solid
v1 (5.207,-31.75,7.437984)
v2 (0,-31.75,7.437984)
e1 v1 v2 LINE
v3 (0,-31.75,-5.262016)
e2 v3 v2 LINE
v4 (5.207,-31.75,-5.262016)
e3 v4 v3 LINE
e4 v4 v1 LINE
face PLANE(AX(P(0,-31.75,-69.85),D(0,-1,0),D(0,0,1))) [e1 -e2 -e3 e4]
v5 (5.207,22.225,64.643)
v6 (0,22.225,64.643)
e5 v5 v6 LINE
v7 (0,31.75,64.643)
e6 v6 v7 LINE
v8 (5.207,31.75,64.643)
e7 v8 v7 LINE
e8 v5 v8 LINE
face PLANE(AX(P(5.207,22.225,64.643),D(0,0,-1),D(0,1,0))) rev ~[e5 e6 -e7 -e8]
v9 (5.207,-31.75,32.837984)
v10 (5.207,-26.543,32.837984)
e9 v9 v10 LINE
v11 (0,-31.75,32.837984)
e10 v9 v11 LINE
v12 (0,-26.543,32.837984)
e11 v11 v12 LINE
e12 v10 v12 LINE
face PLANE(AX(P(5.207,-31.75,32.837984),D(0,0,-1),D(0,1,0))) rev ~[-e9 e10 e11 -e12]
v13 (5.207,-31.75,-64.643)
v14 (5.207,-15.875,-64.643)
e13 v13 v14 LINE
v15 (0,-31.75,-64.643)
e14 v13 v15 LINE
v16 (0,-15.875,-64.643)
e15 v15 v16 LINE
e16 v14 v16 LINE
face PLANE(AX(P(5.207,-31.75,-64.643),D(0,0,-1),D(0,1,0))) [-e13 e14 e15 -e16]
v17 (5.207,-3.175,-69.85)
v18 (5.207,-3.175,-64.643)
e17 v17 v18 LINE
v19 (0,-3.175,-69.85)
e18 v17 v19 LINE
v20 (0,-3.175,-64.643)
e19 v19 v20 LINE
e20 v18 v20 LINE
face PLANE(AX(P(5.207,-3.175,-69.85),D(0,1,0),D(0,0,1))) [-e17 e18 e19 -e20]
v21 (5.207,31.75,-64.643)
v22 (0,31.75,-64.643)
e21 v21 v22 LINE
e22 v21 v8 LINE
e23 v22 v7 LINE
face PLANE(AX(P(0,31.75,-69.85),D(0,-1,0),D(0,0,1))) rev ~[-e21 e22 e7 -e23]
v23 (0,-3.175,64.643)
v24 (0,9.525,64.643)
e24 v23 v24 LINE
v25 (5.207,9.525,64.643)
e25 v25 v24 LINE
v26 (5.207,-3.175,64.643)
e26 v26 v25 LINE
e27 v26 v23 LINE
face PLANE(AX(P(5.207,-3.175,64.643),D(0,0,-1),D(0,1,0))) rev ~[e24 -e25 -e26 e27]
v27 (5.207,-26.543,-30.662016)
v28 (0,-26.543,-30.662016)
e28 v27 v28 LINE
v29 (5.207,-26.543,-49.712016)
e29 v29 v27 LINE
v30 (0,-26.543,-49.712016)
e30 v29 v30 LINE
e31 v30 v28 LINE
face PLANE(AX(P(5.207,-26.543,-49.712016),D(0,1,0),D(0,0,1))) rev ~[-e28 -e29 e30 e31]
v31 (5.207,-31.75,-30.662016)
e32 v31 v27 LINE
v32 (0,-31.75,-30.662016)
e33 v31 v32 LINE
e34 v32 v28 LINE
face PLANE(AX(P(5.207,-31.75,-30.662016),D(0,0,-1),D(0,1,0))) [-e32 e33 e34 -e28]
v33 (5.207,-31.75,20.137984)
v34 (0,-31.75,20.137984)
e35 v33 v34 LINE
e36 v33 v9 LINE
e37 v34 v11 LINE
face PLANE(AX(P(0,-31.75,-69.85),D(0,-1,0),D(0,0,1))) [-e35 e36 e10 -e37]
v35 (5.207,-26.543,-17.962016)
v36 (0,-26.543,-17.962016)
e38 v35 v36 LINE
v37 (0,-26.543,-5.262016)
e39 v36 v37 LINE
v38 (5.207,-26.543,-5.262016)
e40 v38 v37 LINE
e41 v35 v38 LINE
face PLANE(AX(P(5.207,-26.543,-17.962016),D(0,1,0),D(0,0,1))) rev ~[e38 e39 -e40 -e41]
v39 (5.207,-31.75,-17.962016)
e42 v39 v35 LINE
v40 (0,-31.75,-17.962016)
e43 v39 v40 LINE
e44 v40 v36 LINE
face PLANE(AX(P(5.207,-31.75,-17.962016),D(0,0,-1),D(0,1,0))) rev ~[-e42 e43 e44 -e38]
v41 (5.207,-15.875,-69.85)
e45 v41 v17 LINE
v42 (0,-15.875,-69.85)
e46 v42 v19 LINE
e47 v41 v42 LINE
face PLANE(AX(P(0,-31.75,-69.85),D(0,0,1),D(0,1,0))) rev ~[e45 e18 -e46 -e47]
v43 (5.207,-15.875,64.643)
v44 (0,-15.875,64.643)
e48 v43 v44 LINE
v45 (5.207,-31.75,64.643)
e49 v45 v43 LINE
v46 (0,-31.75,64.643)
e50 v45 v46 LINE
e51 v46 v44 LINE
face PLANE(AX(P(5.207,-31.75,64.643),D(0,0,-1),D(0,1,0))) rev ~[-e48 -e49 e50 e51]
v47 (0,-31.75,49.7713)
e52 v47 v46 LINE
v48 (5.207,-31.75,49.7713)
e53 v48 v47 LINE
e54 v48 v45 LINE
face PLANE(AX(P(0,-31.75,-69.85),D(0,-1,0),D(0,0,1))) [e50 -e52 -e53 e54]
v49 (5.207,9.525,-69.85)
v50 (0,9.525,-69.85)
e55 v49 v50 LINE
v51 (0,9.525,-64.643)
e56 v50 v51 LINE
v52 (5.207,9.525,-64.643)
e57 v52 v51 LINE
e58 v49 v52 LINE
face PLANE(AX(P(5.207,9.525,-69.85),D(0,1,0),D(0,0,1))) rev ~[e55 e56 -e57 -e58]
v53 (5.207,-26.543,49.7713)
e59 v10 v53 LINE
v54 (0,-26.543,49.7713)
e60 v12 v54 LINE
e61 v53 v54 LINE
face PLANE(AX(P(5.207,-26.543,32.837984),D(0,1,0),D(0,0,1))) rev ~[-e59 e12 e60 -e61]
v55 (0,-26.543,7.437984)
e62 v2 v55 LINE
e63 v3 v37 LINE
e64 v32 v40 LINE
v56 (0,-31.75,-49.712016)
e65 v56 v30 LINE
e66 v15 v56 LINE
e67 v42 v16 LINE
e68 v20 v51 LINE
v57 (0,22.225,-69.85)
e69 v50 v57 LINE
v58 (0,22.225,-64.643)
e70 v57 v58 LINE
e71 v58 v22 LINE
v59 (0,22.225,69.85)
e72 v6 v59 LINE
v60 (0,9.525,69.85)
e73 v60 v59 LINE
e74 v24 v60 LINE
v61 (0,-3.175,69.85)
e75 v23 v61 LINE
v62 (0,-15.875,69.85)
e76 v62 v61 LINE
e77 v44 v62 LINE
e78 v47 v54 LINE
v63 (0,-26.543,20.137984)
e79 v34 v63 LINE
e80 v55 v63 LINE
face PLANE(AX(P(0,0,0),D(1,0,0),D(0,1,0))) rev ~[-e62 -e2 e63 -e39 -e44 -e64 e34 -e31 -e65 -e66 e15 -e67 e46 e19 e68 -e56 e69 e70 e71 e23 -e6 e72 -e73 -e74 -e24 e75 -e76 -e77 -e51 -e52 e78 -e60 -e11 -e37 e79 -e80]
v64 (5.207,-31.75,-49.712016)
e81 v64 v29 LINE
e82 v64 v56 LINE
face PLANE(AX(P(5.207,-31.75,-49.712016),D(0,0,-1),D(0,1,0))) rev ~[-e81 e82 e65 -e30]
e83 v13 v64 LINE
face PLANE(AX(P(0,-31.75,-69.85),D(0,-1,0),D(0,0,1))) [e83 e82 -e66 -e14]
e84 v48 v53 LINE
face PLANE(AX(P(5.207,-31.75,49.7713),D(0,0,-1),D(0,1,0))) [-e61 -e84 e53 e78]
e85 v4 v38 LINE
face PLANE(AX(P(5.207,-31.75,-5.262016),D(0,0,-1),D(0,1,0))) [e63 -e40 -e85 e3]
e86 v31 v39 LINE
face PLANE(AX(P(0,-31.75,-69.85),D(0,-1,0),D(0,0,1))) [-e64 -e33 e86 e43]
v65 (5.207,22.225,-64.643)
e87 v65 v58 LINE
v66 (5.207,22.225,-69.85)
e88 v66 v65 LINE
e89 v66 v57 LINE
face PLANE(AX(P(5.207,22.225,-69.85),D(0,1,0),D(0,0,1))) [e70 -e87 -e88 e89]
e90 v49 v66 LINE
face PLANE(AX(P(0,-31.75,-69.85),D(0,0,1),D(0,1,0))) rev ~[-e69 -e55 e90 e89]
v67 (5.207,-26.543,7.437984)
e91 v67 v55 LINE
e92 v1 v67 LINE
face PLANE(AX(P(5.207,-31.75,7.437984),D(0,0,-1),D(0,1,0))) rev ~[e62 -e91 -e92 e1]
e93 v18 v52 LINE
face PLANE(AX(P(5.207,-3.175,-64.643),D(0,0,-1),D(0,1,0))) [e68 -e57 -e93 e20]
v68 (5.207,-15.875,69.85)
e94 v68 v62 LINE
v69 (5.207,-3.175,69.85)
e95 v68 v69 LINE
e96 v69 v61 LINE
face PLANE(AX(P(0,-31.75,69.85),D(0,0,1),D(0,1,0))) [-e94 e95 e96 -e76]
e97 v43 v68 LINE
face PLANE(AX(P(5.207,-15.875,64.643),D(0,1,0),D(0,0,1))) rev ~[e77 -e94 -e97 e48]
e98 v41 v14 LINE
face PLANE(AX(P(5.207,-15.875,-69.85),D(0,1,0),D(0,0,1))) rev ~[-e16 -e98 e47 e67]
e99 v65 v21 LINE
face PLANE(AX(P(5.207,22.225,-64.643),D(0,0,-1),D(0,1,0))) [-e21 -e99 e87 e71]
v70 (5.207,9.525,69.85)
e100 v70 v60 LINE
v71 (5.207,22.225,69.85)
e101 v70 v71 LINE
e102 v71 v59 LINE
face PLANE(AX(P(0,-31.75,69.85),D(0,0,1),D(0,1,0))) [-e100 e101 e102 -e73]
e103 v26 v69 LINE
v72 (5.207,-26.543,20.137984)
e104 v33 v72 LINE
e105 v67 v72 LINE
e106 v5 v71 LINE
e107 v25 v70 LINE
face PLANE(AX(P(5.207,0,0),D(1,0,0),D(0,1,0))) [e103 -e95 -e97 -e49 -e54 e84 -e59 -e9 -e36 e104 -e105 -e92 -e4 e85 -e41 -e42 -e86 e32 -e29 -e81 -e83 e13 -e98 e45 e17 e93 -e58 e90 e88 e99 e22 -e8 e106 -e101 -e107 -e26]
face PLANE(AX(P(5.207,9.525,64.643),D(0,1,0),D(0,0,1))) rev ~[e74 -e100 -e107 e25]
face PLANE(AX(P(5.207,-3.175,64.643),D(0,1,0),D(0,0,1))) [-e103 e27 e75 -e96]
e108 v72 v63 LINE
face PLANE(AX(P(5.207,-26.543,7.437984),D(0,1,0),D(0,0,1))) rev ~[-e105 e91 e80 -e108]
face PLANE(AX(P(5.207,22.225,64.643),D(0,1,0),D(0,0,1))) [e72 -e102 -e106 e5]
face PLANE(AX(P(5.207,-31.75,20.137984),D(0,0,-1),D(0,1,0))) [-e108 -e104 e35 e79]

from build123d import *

# Parameters (mm, degrees)
F0_W     = 63.5
F0_H     = 139.7
F1_DEPTH = 5.207
F2_W     = 5.207
F2_H     = 16.9333164
F2_H_2   = 12.7
F2_H_3   = 19.05
F2_W_2   = 15.875
F2_H_4   = 5.207
F2_W_3   = 12.7
F2_W_4   = 9.525
F3_DEPTH = 5.208


# Not quite as in the source:
# - a feature names something its author has since deleted; it is built from what else it names


with BuildPart() as f1:
    # F0 (on Right) → F1 (new body)
    with BuildSketch(Plane.YZ):
        Rectangle(F0_W, F0_H)
    extrude(amount=F1_DEPTH)

    # F2 (on face) → F3 (cut, through all)
    with BuildSketch(Plane.YZ.offset(5.207)):
        with Locations((-29.1465, 41.3046418)):
            Rectangle(F2_W, F2_H)
        with Locations((-29.1465, 13.7879836)):
            Rectangle(F2_W, F2_H_2)
        with Locations((-29.1465, -11.6120164)):
            Rectangle(F2_W, F2_H_2)
        with Locations((-29.1465, -40.1870164)):
            Rectangle(F2_W, F2_H_3)
        with Locations((-23.8125, -67.2465)):
            Rectangle(F2_W_2, F2_H_4)
        with Locations((3.175, -67.2465)):
            Rectangle(F2_W_3, F2_H_4)
        with Locations((26.9875, -67.2465)):
            Rectangle(F2_W_4, F2_H_4)
        with Locations((26.9875, 67.2465)):
            Rectangle(F2_W_4, F2_H_4)
        with Locations((3.175, 67.2465)):
            Rectangle(F2_W_3, F2_H_4)
        with Locations((-23.8125, 67.2465)):
            Rectangle(F2_W_2, F2_H_4)
    extrude(amount=-F3_DEPTH, mode=Mode.SUBTRACT)


solid = f1.part
